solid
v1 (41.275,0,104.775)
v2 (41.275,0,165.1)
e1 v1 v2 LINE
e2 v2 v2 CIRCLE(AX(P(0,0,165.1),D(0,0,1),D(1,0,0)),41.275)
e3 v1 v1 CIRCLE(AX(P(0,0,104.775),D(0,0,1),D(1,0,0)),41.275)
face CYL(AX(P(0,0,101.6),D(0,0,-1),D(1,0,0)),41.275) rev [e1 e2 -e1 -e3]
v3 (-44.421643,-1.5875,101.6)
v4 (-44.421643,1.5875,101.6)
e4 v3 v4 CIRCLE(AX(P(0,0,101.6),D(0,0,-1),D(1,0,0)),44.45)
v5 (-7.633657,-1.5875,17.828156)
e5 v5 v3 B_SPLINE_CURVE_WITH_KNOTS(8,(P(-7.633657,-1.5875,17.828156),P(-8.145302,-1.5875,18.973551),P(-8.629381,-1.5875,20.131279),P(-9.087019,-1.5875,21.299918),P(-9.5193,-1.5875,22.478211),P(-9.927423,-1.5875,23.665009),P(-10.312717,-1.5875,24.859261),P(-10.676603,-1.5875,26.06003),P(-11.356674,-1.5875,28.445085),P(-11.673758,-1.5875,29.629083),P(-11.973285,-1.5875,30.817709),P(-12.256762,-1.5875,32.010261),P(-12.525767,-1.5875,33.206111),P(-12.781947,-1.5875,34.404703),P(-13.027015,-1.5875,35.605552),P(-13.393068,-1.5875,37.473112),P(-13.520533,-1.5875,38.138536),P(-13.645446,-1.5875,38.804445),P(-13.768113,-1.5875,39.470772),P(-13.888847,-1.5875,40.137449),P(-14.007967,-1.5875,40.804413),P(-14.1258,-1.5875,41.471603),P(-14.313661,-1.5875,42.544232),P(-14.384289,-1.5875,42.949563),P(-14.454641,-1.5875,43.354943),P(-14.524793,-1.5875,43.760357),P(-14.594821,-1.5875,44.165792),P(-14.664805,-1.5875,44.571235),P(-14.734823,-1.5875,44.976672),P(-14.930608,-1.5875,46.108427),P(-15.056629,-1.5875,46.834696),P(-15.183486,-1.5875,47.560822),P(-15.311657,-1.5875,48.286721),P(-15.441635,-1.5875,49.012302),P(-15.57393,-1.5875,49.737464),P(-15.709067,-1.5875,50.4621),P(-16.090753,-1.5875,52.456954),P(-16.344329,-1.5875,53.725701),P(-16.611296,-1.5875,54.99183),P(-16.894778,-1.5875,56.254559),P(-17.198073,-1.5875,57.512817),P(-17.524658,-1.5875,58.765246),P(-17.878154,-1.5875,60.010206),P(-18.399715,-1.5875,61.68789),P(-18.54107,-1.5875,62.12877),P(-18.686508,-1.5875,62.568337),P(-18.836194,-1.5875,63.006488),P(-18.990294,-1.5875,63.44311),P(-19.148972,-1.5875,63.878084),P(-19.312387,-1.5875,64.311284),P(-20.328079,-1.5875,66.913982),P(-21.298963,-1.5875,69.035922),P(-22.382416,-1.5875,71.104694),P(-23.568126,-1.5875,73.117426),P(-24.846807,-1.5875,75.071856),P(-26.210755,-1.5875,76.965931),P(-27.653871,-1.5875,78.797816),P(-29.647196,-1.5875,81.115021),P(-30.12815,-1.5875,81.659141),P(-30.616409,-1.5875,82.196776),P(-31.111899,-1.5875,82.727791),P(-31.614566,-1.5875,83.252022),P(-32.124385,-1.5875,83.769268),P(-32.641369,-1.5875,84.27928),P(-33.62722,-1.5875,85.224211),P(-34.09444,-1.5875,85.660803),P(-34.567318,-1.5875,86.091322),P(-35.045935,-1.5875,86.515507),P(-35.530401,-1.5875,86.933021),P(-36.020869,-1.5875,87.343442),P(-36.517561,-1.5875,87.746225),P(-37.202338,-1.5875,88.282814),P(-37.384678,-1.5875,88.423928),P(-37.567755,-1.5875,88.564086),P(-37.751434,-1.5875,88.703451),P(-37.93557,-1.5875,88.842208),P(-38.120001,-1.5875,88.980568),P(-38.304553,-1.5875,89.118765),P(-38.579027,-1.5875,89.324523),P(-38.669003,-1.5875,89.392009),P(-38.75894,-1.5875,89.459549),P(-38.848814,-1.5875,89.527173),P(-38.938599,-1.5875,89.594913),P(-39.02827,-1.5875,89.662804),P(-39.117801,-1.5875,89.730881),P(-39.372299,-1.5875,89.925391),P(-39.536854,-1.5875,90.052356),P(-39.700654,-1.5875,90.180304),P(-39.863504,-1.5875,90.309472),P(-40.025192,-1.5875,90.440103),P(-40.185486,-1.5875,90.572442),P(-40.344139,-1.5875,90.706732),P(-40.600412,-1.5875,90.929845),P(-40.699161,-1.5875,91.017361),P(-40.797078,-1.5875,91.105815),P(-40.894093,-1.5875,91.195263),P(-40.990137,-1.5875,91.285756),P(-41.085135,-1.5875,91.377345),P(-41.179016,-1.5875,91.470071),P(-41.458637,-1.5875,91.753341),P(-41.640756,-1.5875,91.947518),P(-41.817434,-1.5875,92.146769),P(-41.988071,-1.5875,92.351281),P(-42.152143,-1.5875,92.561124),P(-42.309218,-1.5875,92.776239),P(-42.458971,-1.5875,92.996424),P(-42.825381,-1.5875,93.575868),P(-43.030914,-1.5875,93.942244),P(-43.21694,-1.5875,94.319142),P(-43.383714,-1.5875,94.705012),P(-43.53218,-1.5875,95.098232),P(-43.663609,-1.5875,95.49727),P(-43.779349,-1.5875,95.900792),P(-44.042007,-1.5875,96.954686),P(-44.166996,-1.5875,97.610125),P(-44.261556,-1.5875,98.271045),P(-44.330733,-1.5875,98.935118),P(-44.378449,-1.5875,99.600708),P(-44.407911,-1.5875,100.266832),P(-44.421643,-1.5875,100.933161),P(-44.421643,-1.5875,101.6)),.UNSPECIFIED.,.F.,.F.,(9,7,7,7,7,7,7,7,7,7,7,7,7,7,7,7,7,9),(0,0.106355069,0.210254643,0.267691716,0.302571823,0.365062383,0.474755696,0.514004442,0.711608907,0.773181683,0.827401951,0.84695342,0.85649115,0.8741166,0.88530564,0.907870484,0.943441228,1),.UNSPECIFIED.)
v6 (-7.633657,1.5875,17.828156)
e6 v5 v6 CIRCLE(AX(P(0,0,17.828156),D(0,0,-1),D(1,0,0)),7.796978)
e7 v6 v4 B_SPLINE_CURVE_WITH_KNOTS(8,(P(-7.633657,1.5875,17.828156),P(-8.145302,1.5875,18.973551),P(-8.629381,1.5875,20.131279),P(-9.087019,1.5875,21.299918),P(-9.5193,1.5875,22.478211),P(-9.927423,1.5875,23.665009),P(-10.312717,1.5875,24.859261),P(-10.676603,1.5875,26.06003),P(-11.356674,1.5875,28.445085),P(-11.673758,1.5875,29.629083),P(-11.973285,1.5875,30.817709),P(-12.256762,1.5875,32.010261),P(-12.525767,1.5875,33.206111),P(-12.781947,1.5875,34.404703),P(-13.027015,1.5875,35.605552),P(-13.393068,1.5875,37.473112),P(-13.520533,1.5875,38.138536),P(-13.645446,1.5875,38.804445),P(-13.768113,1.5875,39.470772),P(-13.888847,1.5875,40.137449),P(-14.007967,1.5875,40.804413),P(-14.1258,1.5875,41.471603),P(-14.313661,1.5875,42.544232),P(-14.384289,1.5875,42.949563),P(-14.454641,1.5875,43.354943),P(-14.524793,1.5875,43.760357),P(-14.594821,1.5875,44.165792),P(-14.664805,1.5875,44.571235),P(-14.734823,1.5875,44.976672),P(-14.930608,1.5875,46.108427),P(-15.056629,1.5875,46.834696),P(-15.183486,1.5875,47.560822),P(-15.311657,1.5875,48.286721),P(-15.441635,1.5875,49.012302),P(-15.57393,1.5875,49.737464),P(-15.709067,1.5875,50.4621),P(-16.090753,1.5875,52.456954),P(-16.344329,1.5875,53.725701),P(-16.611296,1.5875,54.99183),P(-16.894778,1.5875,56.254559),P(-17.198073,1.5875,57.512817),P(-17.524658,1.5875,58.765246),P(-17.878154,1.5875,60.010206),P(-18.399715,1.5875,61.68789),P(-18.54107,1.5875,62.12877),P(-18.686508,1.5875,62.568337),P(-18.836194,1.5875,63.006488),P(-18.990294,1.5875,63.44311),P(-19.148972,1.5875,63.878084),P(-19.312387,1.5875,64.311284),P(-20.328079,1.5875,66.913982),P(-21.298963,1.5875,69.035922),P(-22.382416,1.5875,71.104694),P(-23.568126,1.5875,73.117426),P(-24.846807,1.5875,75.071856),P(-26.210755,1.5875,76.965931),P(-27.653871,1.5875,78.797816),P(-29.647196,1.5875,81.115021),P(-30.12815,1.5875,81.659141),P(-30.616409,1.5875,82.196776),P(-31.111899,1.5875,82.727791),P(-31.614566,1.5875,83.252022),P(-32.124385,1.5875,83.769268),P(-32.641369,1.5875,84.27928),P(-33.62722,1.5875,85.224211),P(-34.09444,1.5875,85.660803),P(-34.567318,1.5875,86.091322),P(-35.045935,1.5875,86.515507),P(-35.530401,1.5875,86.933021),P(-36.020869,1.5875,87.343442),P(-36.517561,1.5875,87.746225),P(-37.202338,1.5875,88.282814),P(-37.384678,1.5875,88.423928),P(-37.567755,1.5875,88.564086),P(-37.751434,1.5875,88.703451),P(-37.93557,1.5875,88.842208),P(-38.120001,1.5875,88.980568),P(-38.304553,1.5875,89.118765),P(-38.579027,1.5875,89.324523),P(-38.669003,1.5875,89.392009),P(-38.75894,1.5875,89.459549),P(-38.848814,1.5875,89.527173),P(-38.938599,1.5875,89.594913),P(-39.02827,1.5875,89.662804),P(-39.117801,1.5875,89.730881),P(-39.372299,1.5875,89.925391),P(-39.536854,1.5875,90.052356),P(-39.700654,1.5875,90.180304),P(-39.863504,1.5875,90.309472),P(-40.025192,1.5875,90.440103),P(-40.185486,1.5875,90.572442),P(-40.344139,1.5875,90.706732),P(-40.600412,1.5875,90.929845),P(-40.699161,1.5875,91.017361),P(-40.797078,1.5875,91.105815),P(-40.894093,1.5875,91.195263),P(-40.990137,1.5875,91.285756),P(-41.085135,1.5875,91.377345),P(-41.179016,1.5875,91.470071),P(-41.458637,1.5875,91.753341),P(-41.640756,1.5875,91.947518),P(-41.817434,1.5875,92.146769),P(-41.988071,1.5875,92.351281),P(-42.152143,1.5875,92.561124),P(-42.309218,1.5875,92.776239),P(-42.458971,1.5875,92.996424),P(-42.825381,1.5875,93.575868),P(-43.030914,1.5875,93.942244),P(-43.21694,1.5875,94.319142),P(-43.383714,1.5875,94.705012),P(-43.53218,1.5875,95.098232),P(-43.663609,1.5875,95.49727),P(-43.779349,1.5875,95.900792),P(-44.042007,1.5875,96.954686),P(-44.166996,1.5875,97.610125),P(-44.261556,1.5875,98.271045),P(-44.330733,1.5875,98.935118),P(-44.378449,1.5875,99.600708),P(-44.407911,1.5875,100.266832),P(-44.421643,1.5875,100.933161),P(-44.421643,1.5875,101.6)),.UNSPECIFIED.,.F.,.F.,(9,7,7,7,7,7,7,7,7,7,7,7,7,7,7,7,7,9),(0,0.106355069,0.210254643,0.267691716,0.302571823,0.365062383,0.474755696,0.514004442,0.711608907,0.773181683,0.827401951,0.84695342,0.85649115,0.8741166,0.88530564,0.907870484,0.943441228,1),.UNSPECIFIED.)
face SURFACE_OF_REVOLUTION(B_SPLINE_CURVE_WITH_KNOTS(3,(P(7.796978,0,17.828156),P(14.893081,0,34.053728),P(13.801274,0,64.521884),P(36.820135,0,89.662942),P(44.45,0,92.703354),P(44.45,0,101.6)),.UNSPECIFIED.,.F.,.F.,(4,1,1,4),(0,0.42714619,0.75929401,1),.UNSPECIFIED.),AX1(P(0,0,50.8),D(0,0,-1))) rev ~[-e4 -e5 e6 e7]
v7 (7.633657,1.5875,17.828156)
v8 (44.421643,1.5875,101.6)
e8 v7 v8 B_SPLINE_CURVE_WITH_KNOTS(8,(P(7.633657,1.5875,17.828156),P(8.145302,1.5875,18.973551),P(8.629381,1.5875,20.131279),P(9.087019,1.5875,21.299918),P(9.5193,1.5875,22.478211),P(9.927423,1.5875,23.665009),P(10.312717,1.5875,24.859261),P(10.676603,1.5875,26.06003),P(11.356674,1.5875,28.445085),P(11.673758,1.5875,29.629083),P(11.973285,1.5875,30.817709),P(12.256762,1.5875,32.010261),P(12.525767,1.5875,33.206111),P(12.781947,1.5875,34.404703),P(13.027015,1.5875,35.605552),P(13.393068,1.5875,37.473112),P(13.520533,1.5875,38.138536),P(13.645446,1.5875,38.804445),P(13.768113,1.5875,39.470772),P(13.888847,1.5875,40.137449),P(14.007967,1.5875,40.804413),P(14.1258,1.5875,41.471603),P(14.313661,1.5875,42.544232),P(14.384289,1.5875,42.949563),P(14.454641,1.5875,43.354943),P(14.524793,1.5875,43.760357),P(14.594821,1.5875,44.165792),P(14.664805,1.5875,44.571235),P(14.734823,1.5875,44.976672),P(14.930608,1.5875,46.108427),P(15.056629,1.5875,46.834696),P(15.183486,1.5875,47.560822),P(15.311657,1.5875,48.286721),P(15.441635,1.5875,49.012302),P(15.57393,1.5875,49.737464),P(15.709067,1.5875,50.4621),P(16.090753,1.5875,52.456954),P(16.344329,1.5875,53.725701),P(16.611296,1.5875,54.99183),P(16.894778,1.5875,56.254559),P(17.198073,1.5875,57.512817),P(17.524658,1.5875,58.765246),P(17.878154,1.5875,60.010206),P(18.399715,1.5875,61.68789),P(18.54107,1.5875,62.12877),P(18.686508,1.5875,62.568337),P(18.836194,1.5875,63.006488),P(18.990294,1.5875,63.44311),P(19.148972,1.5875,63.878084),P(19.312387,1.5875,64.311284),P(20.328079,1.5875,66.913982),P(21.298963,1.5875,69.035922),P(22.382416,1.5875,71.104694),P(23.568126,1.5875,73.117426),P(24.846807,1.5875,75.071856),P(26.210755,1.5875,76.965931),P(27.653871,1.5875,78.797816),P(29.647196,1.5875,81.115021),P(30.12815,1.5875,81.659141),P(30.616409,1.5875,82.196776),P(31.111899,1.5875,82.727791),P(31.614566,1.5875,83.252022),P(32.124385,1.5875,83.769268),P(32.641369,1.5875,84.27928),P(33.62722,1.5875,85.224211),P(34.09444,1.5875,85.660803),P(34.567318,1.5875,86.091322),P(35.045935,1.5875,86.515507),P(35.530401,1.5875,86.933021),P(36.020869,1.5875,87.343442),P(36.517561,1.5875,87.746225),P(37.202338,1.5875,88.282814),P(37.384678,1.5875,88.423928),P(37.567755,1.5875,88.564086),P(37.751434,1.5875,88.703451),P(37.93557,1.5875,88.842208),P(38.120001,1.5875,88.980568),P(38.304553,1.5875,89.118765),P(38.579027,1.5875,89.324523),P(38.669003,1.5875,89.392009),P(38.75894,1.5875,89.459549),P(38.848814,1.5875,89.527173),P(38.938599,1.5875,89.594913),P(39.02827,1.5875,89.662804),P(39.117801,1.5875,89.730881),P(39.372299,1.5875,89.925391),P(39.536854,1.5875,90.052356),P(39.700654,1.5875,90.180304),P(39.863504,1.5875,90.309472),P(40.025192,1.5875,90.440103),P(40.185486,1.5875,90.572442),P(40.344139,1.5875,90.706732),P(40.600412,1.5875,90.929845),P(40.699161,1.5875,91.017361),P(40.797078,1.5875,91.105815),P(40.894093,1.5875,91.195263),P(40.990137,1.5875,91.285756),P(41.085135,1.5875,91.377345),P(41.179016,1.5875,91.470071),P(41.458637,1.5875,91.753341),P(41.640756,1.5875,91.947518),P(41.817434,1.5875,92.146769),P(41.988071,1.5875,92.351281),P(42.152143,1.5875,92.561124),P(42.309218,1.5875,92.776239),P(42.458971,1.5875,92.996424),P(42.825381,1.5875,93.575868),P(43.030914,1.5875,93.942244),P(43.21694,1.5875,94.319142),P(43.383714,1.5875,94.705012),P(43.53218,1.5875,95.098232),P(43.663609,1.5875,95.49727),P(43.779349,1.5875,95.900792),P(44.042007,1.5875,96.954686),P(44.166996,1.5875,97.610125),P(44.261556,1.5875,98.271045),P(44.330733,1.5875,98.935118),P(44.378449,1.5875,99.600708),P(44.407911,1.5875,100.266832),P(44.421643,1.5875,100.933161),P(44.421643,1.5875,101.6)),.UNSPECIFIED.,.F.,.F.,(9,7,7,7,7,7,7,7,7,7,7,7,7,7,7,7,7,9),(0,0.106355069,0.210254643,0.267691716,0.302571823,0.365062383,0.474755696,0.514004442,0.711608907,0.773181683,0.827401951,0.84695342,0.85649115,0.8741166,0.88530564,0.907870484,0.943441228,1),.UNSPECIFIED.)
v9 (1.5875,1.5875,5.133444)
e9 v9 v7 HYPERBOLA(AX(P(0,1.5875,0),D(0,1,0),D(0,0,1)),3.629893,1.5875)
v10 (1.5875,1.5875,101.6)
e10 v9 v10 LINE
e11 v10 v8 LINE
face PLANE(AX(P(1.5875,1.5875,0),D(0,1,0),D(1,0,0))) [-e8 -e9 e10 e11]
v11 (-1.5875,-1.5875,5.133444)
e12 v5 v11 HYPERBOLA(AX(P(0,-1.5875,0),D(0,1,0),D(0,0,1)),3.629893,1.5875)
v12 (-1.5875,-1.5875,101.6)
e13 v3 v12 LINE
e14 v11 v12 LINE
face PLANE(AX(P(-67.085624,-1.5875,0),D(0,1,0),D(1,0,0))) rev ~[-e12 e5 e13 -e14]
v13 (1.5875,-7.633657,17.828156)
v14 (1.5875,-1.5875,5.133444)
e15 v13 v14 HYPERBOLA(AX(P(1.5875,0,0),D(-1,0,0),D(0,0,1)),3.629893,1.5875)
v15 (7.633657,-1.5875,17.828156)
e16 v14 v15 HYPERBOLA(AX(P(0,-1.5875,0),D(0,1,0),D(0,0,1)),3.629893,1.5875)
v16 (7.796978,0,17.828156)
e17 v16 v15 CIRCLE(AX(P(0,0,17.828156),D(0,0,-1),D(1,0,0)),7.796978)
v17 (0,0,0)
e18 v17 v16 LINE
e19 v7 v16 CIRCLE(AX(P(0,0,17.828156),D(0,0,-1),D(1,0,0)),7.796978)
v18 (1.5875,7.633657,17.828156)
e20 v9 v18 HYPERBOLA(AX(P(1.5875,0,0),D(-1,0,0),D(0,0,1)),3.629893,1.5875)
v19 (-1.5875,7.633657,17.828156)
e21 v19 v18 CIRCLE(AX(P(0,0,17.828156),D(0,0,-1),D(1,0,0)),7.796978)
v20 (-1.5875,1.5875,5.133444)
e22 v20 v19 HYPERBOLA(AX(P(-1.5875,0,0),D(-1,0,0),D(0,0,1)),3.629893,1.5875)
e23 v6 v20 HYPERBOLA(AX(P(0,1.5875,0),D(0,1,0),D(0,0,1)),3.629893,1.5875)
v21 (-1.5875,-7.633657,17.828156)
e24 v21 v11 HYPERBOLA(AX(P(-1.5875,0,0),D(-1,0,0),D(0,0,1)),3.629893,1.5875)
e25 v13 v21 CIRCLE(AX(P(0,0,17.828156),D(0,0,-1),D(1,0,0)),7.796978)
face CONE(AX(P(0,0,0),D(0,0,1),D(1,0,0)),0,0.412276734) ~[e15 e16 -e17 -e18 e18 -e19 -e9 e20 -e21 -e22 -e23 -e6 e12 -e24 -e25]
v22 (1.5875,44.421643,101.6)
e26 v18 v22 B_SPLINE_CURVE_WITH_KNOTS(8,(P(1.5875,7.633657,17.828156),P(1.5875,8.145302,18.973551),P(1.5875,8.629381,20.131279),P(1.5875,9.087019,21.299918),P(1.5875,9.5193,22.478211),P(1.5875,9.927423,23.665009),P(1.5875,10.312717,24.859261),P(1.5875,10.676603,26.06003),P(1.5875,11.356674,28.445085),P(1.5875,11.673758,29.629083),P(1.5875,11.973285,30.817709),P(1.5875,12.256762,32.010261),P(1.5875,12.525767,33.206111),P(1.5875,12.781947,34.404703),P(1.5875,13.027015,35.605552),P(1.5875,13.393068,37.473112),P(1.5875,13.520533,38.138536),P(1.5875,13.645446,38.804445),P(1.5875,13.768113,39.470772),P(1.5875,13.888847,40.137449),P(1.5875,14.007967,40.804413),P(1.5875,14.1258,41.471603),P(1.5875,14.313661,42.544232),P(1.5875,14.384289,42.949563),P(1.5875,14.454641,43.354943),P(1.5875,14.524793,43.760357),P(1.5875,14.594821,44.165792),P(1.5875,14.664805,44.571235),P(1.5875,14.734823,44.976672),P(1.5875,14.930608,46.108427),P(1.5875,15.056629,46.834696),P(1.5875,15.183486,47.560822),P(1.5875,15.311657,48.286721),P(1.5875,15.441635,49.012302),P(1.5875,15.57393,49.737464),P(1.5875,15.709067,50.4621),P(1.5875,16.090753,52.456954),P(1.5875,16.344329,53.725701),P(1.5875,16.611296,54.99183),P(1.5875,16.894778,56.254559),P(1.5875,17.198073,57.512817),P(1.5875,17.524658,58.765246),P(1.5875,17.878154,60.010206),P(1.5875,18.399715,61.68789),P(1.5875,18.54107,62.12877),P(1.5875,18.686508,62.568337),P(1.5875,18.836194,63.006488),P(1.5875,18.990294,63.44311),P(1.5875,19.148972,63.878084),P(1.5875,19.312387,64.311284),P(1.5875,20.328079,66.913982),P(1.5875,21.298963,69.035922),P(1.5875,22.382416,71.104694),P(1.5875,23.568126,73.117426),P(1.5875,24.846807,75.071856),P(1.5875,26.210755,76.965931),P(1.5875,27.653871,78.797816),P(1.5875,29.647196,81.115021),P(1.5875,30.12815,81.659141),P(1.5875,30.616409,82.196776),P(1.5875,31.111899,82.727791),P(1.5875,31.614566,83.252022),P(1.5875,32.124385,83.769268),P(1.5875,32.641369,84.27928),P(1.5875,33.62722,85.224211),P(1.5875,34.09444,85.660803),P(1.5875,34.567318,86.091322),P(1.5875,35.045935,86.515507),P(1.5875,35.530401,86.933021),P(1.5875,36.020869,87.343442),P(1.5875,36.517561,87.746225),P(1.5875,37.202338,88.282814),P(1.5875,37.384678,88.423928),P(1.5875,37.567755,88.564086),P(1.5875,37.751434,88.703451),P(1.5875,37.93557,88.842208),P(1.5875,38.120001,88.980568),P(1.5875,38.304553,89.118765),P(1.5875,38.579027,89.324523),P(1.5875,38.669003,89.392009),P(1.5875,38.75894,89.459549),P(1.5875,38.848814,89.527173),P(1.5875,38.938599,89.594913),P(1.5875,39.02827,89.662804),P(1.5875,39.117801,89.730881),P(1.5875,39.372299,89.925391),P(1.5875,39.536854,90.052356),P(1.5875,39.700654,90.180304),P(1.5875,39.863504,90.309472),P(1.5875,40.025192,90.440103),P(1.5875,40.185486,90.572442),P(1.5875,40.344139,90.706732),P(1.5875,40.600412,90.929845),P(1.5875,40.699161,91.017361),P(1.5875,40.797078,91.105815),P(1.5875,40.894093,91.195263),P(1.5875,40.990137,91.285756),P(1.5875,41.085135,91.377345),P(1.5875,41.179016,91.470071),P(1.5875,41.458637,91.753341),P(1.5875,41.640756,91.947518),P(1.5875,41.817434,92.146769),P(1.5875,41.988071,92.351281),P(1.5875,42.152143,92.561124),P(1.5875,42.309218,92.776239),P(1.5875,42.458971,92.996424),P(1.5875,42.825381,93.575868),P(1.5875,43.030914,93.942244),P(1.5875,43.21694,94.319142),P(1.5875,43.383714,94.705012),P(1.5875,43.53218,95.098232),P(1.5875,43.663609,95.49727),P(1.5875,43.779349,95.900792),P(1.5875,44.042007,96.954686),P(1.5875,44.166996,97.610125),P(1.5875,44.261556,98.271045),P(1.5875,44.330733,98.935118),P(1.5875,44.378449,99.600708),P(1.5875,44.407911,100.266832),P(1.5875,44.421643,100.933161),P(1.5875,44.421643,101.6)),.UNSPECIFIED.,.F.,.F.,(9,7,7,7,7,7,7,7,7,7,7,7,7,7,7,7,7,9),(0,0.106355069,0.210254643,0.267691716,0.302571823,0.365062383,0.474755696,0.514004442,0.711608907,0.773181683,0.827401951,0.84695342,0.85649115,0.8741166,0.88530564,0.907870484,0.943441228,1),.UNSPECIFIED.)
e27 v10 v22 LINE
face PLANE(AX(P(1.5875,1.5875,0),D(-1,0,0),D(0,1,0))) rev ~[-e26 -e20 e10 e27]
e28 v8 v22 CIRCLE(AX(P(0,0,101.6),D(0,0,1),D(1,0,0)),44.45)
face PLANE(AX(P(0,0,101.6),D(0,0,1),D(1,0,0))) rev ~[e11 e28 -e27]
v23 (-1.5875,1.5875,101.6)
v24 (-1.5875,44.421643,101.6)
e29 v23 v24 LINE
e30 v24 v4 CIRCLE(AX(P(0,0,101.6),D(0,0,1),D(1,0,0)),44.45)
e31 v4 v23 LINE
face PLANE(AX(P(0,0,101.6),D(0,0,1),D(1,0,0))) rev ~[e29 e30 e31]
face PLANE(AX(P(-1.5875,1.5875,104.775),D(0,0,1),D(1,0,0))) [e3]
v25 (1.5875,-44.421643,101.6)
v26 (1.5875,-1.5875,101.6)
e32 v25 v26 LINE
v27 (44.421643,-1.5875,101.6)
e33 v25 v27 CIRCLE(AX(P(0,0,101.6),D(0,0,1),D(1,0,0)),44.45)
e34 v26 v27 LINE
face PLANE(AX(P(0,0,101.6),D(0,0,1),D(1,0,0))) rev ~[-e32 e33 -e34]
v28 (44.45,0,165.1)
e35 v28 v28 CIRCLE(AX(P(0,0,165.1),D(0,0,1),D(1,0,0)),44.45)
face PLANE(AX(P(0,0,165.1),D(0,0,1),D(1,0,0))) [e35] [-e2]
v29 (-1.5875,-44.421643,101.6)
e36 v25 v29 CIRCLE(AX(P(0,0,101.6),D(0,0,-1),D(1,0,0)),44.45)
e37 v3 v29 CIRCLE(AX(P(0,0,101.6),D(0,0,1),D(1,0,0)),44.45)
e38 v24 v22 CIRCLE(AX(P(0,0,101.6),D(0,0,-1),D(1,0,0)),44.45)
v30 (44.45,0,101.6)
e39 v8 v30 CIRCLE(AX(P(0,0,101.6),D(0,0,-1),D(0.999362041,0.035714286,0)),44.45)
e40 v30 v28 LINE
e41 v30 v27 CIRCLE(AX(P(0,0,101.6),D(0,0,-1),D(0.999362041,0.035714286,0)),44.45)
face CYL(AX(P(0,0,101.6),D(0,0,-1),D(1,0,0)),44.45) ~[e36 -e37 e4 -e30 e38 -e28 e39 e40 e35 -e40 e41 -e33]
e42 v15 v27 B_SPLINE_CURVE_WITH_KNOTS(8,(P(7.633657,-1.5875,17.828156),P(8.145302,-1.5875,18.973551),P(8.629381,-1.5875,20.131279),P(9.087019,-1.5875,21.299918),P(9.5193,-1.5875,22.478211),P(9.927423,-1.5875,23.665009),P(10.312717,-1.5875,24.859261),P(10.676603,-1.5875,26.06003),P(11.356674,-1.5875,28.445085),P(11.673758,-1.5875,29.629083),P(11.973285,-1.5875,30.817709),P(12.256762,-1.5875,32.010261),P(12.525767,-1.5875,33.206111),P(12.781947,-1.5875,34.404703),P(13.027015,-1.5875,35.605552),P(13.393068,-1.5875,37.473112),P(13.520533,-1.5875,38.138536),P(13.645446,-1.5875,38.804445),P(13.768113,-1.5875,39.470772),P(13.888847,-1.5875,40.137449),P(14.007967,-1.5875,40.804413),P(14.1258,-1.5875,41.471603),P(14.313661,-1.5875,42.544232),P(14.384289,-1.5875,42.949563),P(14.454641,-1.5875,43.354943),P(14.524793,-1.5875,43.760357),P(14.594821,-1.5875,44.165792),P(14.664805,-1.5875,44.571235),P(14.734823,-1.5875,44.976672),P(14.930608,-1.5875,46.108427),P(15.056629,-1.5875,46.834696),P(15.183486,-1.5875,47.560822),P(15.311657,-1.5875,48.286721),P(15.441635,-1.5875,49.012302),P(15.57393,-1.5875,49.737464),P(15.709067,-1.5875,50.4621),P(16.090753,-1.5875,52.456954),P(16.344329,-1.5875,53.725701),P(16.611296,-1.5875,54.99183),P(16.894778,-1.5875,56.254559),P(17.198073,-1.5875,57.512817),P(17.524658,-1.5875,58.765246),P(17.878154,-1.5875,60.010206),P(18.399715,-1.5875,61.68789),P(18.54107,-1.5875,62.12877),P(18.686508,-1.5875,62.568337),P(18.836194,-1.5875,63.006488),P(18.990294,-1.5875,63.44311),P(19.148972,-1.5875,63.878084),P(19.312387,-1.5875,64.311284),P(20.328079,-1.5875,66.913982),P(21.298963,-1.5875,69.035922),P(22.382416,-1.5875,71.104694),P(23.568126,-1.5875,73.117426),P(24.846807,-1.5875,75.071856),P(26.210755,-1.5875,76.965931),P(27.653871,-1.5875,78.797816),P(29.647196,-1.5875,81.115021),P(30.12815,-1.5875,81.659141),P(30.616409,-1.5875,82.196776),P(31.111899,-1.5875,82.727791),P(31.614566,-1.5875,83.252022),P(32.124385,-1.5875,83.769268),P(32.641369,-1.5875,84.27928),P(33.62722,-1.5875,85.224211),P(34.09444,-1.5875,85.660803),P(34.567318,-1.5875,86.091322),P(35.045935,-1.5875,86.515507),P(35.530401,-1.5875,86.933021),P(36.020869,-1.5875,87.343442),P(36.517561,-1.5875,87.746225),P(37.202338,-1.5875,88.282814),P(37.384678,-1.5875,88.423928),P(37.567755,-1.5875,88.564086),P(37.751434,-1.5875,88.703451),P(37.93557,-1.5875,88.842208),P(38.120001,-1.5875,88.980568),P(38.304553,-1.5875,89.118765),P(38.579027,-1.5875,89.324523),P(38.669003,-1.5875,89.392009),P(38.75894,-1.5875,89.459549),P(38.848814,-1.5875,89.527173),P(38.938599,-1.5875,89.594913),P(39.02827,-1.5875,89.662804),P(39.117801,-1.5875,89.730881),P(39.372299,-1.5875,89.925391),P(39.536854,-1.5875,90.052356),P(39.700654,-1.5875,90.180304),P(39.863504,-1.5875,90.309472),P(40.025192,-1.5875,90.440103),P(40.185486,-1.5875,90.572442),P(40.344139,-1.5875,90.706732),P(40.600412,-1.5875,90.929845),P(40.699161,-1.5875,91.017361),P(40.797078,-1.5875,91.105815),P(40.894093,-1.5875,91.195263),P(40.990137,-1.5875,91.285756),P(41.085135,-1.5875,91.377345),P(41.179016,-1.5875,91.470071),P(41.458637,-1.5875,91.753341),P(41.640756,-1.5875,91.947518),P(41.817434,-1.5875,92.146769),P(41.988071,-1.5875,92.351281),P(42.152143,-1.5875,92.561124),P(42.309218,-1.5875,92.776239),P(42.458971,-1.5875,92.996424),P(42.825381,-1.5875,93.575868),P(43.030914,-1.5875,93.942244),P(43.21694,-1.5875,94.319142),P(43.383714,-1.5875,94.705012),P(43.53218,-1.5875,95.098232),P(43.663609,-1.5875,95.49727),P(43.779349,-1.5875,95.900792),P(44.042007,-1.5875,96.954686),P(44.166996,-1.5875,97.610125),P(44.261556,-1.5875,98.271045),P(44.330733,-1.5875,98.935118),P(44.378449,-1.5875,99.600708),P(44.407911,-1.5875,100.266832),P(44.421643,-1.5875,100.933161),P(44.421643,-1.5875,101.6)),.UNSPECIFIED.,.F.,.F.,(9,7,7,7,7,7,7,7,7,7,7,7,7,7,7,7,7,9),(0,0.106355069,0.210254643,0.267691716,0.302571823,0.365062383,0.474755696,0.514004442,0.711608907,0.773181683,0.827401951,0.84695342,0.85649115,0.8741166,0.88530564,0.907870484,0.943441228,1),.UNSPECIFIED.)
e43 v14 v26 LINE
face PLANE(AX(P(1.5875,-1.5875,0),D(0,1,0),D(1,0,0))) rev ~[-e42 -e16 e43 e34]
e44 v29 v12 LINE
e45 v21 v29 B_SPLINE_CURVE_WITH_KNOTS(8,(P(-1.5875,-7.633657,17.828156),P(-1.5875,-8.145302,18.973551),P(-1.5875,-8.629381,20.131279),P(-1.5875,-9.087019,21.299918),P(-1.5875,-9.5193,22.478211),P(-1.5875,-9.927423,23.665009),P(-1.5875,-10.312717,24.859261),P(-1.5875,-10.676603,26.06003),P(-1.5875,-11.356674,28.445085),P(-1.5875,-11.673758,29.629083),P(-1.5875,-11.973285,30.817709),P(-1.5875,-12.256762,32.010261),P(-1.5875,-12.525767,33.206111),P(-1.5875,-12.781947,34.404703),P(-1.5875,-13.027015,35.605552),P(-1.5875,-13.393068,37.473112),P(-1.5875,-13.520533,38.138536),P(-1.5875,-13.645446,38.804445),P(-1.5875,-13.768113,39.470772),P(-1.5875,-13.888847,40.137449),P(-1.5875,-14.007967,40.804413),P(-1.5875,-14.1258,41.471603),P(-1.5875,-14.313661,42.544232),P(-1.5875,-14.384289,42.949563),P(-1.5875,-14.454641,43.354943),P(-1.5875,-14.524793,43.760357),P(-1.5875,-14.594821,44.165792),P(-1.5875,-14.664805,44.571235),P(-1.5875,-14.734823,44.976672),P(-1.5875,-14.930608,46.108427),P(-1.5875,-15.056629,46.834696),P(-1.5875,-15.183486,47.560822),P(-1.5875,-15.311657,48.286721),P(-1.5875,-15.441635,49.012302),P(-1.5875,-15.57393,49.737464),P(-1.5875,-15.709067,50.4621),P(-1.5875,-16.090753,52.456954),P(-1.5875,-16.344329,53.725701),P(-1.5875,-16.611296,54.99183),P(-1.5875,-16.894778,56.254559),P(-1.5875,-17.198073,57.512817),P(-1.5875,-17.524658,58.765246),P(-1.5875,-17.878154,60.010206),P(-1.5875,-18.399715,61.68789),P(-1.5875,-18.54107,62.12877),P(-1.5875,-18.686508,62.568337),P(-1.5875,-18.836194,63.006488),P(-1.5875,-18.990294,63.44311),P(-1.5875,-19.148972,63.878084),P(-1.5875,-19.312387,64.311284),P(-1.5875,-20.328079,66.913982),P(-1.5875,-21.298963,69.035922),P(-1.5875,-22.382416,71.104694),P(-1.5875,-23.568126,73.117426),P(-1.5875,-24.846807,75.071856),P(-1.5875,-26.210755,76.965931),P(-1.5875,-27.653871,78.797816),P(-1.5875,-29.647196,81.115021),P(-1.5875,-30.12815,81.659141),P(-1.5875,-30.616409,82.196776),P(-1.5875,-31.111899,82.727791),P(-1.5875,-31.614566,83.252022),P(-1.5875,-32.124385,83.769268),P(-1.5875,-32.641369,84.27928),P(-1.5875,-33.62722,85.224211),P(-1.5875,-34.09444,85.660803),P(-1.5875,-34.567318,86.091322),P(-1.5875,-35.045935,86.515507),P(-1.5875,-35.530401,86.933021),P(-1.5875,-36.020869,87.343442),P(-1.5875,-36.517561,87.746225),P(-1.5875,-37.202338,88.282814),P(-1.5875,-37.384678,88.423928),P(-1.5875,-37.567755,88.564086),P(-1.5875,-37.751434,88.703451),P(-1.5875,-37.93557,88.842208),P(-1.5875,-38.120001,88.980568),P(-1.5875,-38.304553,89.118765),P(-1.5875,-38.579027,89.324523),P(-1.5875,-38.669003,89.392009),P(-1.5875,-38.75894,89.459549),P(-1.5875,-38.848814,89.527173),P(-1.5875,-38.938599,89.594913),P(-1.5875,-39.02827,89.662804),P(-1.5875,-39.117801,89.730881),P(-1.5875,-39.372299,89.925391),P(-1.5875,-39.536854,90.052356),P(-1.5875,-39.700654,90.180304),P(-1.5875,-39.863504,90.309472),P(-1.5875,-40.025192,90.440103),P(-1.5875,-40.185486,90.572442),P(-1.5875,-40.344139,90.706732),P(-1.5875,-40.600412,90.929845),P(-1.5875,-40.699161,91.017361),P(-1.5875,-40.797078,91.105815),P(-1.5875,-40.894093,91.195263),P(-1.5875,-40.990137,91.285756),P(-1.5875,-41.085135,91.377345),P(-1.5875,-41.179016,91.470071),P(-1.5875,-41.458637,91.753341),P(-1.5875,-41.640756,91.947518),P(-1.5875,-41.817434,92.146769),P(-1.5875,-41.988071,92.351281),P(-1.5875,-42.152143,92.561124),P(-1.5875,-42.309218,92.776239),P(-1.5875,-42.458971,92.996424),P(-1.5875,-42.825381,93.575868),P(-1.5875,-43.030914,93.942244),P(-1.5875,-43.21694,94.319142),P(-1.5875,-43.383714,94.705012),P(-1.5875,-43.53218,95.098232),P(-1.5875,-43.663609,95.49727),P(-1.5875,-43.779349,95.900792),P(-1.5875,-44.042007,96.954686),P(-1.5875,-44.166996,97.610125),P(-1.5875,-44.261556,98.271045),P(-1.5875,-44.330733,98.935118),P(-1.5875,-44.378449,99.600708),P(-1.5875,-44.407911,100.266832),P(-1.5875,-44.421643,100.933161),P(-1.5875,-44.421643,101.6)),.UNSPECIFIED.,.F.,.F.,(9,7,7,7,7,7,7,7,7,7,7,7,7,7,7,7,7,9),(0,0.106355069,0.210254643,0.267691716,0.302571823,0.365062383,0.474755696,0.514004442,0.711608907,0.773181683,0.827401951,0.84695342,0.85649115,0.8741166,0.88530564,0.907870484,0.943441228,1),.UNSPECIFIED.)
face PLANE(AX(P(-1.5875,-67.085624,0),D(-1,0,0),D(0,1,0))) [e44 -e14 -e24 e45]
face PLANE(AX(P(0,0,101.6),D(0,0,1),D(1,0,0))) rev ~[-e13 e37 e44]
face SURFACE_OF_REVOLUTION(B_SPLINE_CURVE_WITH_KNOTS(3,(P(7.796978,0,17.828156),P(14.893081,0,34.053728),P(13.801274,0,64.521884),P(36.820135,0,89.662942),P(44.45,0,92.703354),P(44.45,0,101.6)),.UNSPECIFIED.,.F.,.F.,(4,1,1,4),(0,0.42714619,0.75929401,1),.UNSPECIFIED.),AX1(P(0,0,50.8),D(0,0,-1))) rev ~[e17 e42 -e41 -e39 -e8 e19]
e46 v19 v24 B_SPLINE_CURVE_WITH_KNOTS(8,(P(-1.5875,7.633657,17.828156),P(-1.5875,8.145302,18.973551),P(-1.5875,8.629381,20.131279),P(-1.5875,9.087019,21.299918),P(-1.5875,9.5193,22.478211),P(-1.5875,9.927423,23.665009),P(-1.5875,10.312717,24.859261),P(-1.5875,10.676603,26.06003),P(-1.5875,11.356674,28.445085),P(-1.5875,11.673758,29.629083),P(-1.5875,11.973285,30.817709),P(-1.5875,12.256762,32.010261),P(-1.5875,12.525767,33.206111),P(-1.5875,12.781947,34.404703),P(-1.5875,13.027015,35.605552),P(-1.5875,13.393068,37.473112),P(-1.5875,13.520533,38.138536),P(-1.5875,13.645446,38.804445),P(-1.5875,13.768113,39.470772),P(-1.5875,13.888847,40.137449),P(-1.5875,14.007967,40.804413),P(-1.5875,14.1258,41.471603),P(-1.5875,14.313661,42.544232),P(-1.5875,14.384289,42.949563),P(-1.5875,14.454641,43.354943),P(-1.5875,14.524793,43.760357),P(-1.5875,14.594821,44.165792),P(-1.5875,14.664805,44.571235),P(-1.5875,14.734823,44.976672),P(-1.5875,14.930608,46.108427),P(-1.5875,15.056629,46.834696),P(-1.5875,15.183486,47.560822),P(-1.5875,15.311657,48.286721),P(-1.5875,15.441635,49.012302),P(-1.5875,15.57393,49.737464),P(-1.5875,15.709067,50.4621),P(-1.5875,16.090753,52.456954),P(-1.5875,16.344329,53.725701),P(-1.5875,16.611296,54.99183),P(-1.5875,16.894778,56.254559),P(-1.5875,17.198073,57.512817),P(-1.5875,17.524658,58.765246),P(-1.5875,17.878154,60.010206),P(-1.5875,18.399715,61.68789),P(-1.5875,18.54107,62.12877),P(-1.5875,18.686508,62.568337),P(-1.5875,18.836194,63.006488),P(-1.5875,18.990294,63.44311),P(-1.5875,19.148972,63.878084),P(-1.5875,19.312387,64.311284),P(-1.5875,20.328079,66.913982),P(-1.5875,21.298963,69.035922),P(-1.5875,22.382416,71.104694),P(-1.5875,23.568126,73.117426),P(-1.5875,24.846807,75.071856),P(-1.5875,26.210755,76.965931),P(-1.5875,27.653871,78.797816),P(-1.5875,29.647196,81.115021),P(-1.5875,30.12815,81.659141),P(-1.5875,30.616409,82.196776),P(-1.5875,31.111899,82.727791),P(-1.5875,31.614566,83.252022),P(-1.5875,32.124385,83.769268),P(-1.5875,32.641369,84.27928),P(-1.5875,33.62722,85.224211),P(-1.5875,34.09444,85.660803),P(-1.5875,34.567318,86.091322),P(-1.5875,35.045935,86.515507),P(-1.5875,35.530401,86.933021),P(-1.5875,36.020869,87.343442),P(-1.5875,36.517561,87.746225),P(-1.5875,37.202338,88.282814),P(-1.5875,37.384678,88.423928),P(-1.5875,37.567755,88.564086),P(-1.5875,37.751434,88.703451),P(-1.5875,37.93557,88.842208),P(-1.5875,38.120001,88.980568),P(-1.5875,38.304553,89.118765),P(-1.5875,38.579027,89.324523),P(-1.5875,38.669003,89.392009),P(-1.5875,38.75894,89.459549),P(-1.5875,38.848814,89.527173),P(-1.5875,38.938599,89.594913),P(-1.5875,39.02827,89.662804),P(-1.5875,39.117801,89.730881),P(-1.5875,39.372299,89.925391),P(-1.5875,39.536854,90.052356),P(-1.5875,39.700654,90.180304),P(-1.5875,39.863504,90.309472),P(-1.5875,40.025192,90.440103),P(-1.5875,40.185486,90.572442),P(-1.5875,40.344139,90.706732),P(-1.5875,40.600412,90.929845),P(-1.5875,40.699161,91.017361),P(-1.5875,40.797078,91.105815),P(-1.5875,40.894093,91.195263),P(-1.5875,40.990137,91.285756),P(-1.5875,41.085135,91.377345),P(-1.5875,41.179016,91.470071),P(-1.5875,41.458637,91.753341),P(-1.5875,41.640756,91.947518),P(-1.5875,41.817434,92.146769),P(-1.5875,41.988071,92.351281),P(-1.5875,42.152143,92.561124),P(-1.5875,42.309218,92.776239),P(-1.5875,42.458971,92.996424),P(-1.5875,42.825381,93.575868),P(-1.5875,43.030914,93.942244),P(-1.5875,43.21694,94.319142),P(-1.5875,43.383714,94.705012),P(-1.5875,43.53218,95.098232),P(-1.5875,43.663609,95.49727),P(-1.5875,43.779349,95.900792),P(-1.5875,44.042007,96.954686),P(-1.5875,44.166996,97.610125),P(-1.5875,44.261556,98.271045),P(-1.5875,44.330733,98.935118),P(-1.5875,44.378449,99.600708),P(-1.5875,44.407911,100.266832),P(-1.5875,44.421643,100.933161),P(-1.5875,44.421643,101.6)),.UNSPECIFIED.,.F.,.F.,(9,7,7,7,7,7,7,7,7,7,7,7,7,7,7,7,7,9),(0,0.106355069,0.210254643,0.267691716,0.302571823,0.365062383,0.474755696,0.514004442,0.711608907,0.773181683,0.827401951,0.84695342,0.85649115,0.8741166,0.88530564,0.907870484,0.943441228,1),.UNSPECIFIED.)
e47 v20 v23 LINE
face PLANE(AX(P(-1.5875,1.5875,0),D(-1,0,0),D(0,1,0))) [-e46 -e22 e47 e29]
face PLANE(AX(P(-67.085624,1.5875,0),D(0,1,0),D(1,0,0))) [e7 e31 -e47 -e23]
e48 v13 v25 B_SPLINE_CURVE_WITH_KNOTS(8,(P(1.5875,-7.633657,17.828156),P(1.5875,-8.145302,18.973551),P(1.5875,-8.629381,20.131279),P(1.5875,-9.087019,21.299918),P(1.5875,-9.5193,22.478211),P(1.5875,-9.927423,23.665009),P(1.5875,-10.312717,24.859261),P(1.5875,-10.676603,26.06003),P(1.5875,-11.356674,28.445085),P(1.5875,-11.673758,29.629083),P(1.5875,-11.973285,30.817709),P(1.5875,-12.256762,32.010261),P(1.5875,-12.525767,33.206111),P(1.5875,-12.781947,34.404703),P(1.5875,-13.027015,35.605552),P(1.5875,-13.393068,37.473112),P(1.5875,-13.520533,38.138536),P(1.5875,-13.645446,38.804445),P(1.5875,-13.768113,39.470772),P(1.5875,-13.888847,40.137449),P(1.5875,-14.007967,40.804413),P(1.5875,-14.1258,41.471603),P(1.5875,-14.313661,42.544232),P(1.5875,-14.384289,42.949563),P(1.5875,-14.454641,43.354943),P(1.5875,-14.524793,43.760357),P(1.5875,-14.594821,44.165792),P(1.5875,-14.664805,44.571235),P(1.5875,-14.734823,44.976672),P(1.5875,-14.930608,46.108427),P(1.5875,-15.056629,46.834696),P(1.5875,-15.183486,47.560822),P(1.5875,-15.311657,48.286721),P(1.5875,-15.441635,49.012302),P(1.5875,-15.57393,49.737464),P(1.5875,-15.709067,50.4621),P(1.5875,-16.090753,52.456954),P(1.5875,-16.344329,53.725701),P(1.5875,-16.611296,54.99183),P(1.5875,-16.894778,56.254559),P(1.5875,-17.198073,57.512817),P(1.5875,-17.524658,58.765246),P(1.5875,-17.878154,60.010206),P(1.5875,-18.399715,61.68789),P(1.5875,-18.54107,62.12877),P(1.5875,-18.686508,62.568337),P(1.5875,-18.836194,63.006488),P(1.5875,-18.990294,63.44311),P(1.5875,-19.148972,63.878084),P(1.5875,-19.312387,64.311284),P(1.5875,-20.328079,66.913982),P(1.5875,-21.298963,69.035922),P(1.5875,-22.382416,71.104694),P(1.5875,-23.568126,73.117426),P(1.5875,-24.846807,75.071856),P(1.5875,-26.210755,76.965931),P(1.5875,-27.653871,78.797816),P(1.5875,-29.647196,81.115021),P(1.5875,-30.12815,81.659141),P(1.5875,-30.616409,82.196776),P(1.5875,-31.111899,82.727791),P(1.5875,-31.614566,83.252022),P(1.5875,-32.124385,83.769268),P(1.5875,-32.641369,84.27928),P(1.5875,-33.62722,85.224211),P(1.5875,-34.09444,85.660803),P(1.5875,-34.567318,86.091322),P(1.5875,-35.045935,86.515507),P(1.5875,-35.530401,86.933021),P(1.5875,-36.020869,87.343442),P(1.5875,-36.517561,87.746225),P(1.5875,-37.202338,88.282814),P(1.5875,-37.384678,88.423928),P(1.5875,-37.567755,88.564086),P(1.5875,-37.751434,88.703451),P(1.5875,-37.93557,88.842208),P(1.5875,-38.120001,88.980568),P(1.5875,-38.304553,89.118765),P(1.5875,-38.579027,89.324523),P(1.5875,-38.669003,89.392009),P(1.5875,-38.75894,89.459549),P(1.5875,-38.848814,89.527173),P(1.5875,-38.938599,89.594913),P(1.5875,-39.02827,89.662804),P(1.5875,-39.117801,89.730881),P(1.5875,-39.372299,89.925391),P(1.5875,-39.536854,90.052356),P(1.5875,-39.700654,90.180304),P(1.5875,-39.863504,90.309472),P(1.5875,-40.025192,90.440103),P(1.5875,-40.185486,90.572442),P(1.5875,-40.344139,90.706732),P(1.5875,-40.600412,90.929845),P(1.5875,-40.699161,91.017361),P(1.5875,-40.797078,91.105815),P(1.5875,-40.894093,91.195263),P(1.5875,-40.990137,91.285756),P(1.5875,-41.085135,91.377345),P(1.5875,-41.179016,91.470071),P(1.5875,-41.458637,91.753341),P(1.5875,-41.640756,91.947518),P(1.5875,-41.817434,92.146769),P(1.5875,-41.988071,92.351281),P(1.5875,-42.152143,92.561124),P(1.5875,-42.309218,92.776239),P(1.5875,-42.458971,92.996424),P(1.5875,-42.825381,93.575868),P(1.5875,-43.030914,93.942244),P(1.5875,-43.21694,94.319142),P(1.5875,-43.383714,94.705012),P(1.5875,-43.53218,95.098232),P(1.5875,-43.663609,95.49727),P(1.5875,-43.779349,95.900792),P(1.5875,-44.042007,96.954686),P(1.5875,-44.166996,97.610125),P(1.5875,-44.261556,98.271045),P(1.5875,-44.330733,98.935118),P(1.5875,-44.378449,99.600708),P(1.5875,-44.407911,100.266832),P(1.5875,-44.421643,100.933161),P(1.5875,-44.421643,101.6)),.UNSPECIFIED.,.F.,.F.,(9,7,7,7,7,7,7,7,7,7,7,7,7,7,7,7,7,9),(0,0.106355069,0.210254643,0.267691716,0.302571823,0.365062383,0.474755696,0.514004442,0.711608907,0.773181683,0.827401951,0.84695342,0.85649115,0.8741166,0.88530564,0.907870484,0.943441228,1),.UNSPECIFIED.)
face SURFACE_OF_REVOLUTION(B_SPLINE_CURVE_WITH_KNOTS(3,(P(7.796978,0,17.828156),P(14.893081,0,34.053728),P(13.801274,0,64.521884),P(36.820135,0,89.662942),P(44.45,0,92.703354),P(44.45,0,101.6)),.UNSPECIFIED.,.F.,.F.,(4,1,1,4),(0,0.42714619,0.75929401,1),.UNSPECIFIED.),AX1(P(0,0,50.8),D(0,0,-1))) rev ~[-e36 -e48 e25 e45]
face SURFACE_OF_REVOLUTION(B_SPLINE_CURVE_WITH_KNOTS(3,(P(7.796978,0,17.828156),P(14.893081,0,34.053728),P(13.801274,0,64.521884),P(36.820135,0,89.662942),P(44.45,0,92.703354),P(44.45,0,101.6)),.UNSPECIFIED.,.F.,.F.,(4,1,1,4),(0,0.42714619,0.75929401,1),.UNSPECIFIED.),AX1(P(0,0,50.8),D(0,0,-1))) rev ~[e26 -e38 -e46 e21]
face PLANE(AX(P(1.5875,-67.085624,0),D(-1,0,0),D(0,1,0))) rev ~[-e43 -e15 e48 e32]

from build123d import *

# Parameters (mm, degrees)
F2_W         = 65.4981237411
F2_H         = 65.4981237411
F2_H_2       = 68.2687636971
F3_DEPTH     = 101.6
F4_R         = 44.45
F5_DEPTH     = 63.5
F6_T         = 3.175
F6_T3_DEPTH  = 49.1841427403
F6_T5_DEPTH  = 102.8165560233
F6_T7_DEPTH  = 49.1841427403
F6_T9_DEPTH  = 49.1841427403
F6_T11_DEPTH = 49.1841427403


# Not quite as in the source:
# - a shell that OpenCascade refuses in one call is made with other operations: the cavity is built on its own and cut out


with BuildPart() as f1:
    # F0 (on Front) → F1 (revolve)
    with BuildSketch(Plane.XZ):
        with BuildLine():
            Line((0, 101.6), (0, 0))
            Line((0, 0), (7.7969783843, 17.828155983))
            add(Edge.make_bspline(
                [(7.7969783843, 17.828155983), (14.8930814395, 34.0537277243), (13.801273804, 64.5218843491), (36.8201349812, 89.6629422756), (44.45, 92.7033537653), (44.45, 101.6)],
                knots=[0, 0, 0, 0, 0.4271461897, 0.75929401, 1, 1, 1, 1], degree=3))
            Line((44.45, 101.6), (0, 101.6))
        make_face()
    revolve(axis=Axis((0, 0, 50.8), (0, 0, -1)))

    # F2 (on Top) → F3 (cut, through all)
    with BuildSketch(Plane.XY):
        with Locations((-34.3365618706, -34.3365618706)):
            Rectangle(F2_W, F2_H)
        with Locations((34.3365618706, 35.7218818486)):
            Rectangle(F2_W, F2_H_2)
        with Locations((-34.3365618706, 35.7218818486)):
            Rectangle(F2_W, F2_H_2)
        with Locations((34.3365618706, -34.3365618706)):
            Rectangle(F2_W, F2_H)
    extrude(amount=F3_DEPTH, mode=Mode.SUBTRACT)

    # F4 (on face) → F5 (join)
    with BuildSketch(Plane.XY.offset(101.6)):
        Circle(F4_R)
    extrude(amount=F5_DEPTH)

    # F6: shell of thickness 3.175, made by hand


with BuildPart() as f6_core1:
    # F6_t2: copy of F1
    add(f1.part)

    # the walls: a layer under each face that stays
    f6_faces = [f6_core1.faces().sort_by_distance(p)[0] for p in [
        (22.6899295983, 0, 71.3288999003),
        (-44.45, 0, 133.35),
        (8.7265237901, 1.5875, 85.5222406628),
        (-3.8984891922, 0, 8.9140779915),
        (23.0045713702, -1.5875, 85.5222406628),
        (23.0045713702, 23.0045713702, 101.6),
        (0, 22.6899295983, 71.3288999003),
        (-23.0045713702, 23.0045713702, 101.6),
        (-22.6899295983, 0, 71.3288999003),
        (-23.0045713702, -23.0045713702, 101.6),
        (0, -22.6899295983, 71.3288999003),
        (23.0045713702, -23.0045713702, 101.6),
        (1.5875, 23.0045713702, 85.5222406628),
        (1.5875, -8.7265237901, 85.5222406628),
        (-1.5875, -23.0045713702, 85.5222406628),
        (-8.7265237901, -1.5875, 85.5222406628),
        (-23.0045713702, 1.5875, 85.5222406628),
        (-1.5875, 8.7265237901, 85.5222406628),
    ]]
    thicken(f6_faces, amount=-F6_T, mode=Mode.SUBTRACT)

    # F6_s4 → F6_t3 (cut)
    with BuildSketch(Plane.YZ.offset(-1.5875)):
        Polygon((1.61925, 101.56825), (-1.5875, 101.6), (-1.5875, 104.775), (1.5875, 104.775), align=None)
        Polygon((-1.61925, 101.56825), (1.5875, 101.6), (1.5875, 104.775), (-1.5875, 104.775), align=None)
    extrude(amount=F6_T3_DEPTH, mode=Mode.SUBTRACT)

    # F6_s6 → F6_t5 (cut)
    with BuildSketch(Plane.XY.offset(1.9584439767)):
        Polygon((1.61925, 1.61925), (1.5875, -1.5875), (-1.5875, -1.5875), (-1.5875, 1.5875), align=None)
        Polygon((1.61925, -1.61925), (1.5875, 1.5875), (-1.5875, 1.5875), (-1.5875, -1.5875), align=None)
        Polygon((-1.61925, -1.61925), (1.5875, -1.5875), (1.5875, 1.5875), (-1.5875, 1.5875), align=None)
        Polygon((-1.61925, 1.61925), (-1.5875, -1.5875), (1.5875, -1.5875), (1.5875, 1.5875), align=None)
    extrude(amount=F6_T5_DEPTH, mode=Mode.SUBTRACT)

    # F6_s8 → F6_t7 (cut)
    with BuildSketch(Plane.XZ.offset(-47.5966427403)):
        Polygon((1.61925, 101.56825), (1.5875, 104.775), (-1.5875, 104.775), (-1.5875, 101.6), align=None)
        Polygon((-1.61925, 101.56825), (-1.5875, 104.775), (1.5875, 104.775), (1.5875, 101.6), align=None)
    extrude(amount=F6_T7_DEPTH, mode=Mode.SUBTRACT)

    # F6_s10 → F6_t9 (cut)
    with BuildSketch(Plane.YZ.offset(-47.5966427403)):
        Polygon((1.61925, 101.56825), (1.5875, 104.775), (-1.5875, 104.775), (-1.5875, 101.6), align=None)
        Polygon((-1.61925, 101.56825), (-1.5875, 104.775), (1.5875, 104.775), (1.5875, 101.6), align=None)
    extrude(amount=F6_T9_DEPTH, mode=Mode.SUBTRACT)

    # F6_s12 → F6_t11 (cut)
    with BuildSketch(Plane.XZ.offset(-1.5875)):
        Polygon((-1.61925, 101.56825), (-1.5875, 104.775), (1.5875, 104.775), (1.5875, 101.6), align=None)
        Polygon((1.61925, 101.56825), (1.5875, 104.775), (-1.5875, 104.775), (-1.5875, 101.6), align=None)
    extrude(amount=F6_T11_DEPTH, mode=Mode.SUBTRACT)


with BuildPart() as f1_1:
    add(f1.part)

    # what is left inside the walls is the cavity
    f6_cavity = [f6_core1.part.solids().sort_by_distance(p)[0] for p in [
        (-41.24325, 0, 144.991667),
    ]]
    add(f6_cavity, mode=Mode.SUBTRACT)


solid = f1_1.part
